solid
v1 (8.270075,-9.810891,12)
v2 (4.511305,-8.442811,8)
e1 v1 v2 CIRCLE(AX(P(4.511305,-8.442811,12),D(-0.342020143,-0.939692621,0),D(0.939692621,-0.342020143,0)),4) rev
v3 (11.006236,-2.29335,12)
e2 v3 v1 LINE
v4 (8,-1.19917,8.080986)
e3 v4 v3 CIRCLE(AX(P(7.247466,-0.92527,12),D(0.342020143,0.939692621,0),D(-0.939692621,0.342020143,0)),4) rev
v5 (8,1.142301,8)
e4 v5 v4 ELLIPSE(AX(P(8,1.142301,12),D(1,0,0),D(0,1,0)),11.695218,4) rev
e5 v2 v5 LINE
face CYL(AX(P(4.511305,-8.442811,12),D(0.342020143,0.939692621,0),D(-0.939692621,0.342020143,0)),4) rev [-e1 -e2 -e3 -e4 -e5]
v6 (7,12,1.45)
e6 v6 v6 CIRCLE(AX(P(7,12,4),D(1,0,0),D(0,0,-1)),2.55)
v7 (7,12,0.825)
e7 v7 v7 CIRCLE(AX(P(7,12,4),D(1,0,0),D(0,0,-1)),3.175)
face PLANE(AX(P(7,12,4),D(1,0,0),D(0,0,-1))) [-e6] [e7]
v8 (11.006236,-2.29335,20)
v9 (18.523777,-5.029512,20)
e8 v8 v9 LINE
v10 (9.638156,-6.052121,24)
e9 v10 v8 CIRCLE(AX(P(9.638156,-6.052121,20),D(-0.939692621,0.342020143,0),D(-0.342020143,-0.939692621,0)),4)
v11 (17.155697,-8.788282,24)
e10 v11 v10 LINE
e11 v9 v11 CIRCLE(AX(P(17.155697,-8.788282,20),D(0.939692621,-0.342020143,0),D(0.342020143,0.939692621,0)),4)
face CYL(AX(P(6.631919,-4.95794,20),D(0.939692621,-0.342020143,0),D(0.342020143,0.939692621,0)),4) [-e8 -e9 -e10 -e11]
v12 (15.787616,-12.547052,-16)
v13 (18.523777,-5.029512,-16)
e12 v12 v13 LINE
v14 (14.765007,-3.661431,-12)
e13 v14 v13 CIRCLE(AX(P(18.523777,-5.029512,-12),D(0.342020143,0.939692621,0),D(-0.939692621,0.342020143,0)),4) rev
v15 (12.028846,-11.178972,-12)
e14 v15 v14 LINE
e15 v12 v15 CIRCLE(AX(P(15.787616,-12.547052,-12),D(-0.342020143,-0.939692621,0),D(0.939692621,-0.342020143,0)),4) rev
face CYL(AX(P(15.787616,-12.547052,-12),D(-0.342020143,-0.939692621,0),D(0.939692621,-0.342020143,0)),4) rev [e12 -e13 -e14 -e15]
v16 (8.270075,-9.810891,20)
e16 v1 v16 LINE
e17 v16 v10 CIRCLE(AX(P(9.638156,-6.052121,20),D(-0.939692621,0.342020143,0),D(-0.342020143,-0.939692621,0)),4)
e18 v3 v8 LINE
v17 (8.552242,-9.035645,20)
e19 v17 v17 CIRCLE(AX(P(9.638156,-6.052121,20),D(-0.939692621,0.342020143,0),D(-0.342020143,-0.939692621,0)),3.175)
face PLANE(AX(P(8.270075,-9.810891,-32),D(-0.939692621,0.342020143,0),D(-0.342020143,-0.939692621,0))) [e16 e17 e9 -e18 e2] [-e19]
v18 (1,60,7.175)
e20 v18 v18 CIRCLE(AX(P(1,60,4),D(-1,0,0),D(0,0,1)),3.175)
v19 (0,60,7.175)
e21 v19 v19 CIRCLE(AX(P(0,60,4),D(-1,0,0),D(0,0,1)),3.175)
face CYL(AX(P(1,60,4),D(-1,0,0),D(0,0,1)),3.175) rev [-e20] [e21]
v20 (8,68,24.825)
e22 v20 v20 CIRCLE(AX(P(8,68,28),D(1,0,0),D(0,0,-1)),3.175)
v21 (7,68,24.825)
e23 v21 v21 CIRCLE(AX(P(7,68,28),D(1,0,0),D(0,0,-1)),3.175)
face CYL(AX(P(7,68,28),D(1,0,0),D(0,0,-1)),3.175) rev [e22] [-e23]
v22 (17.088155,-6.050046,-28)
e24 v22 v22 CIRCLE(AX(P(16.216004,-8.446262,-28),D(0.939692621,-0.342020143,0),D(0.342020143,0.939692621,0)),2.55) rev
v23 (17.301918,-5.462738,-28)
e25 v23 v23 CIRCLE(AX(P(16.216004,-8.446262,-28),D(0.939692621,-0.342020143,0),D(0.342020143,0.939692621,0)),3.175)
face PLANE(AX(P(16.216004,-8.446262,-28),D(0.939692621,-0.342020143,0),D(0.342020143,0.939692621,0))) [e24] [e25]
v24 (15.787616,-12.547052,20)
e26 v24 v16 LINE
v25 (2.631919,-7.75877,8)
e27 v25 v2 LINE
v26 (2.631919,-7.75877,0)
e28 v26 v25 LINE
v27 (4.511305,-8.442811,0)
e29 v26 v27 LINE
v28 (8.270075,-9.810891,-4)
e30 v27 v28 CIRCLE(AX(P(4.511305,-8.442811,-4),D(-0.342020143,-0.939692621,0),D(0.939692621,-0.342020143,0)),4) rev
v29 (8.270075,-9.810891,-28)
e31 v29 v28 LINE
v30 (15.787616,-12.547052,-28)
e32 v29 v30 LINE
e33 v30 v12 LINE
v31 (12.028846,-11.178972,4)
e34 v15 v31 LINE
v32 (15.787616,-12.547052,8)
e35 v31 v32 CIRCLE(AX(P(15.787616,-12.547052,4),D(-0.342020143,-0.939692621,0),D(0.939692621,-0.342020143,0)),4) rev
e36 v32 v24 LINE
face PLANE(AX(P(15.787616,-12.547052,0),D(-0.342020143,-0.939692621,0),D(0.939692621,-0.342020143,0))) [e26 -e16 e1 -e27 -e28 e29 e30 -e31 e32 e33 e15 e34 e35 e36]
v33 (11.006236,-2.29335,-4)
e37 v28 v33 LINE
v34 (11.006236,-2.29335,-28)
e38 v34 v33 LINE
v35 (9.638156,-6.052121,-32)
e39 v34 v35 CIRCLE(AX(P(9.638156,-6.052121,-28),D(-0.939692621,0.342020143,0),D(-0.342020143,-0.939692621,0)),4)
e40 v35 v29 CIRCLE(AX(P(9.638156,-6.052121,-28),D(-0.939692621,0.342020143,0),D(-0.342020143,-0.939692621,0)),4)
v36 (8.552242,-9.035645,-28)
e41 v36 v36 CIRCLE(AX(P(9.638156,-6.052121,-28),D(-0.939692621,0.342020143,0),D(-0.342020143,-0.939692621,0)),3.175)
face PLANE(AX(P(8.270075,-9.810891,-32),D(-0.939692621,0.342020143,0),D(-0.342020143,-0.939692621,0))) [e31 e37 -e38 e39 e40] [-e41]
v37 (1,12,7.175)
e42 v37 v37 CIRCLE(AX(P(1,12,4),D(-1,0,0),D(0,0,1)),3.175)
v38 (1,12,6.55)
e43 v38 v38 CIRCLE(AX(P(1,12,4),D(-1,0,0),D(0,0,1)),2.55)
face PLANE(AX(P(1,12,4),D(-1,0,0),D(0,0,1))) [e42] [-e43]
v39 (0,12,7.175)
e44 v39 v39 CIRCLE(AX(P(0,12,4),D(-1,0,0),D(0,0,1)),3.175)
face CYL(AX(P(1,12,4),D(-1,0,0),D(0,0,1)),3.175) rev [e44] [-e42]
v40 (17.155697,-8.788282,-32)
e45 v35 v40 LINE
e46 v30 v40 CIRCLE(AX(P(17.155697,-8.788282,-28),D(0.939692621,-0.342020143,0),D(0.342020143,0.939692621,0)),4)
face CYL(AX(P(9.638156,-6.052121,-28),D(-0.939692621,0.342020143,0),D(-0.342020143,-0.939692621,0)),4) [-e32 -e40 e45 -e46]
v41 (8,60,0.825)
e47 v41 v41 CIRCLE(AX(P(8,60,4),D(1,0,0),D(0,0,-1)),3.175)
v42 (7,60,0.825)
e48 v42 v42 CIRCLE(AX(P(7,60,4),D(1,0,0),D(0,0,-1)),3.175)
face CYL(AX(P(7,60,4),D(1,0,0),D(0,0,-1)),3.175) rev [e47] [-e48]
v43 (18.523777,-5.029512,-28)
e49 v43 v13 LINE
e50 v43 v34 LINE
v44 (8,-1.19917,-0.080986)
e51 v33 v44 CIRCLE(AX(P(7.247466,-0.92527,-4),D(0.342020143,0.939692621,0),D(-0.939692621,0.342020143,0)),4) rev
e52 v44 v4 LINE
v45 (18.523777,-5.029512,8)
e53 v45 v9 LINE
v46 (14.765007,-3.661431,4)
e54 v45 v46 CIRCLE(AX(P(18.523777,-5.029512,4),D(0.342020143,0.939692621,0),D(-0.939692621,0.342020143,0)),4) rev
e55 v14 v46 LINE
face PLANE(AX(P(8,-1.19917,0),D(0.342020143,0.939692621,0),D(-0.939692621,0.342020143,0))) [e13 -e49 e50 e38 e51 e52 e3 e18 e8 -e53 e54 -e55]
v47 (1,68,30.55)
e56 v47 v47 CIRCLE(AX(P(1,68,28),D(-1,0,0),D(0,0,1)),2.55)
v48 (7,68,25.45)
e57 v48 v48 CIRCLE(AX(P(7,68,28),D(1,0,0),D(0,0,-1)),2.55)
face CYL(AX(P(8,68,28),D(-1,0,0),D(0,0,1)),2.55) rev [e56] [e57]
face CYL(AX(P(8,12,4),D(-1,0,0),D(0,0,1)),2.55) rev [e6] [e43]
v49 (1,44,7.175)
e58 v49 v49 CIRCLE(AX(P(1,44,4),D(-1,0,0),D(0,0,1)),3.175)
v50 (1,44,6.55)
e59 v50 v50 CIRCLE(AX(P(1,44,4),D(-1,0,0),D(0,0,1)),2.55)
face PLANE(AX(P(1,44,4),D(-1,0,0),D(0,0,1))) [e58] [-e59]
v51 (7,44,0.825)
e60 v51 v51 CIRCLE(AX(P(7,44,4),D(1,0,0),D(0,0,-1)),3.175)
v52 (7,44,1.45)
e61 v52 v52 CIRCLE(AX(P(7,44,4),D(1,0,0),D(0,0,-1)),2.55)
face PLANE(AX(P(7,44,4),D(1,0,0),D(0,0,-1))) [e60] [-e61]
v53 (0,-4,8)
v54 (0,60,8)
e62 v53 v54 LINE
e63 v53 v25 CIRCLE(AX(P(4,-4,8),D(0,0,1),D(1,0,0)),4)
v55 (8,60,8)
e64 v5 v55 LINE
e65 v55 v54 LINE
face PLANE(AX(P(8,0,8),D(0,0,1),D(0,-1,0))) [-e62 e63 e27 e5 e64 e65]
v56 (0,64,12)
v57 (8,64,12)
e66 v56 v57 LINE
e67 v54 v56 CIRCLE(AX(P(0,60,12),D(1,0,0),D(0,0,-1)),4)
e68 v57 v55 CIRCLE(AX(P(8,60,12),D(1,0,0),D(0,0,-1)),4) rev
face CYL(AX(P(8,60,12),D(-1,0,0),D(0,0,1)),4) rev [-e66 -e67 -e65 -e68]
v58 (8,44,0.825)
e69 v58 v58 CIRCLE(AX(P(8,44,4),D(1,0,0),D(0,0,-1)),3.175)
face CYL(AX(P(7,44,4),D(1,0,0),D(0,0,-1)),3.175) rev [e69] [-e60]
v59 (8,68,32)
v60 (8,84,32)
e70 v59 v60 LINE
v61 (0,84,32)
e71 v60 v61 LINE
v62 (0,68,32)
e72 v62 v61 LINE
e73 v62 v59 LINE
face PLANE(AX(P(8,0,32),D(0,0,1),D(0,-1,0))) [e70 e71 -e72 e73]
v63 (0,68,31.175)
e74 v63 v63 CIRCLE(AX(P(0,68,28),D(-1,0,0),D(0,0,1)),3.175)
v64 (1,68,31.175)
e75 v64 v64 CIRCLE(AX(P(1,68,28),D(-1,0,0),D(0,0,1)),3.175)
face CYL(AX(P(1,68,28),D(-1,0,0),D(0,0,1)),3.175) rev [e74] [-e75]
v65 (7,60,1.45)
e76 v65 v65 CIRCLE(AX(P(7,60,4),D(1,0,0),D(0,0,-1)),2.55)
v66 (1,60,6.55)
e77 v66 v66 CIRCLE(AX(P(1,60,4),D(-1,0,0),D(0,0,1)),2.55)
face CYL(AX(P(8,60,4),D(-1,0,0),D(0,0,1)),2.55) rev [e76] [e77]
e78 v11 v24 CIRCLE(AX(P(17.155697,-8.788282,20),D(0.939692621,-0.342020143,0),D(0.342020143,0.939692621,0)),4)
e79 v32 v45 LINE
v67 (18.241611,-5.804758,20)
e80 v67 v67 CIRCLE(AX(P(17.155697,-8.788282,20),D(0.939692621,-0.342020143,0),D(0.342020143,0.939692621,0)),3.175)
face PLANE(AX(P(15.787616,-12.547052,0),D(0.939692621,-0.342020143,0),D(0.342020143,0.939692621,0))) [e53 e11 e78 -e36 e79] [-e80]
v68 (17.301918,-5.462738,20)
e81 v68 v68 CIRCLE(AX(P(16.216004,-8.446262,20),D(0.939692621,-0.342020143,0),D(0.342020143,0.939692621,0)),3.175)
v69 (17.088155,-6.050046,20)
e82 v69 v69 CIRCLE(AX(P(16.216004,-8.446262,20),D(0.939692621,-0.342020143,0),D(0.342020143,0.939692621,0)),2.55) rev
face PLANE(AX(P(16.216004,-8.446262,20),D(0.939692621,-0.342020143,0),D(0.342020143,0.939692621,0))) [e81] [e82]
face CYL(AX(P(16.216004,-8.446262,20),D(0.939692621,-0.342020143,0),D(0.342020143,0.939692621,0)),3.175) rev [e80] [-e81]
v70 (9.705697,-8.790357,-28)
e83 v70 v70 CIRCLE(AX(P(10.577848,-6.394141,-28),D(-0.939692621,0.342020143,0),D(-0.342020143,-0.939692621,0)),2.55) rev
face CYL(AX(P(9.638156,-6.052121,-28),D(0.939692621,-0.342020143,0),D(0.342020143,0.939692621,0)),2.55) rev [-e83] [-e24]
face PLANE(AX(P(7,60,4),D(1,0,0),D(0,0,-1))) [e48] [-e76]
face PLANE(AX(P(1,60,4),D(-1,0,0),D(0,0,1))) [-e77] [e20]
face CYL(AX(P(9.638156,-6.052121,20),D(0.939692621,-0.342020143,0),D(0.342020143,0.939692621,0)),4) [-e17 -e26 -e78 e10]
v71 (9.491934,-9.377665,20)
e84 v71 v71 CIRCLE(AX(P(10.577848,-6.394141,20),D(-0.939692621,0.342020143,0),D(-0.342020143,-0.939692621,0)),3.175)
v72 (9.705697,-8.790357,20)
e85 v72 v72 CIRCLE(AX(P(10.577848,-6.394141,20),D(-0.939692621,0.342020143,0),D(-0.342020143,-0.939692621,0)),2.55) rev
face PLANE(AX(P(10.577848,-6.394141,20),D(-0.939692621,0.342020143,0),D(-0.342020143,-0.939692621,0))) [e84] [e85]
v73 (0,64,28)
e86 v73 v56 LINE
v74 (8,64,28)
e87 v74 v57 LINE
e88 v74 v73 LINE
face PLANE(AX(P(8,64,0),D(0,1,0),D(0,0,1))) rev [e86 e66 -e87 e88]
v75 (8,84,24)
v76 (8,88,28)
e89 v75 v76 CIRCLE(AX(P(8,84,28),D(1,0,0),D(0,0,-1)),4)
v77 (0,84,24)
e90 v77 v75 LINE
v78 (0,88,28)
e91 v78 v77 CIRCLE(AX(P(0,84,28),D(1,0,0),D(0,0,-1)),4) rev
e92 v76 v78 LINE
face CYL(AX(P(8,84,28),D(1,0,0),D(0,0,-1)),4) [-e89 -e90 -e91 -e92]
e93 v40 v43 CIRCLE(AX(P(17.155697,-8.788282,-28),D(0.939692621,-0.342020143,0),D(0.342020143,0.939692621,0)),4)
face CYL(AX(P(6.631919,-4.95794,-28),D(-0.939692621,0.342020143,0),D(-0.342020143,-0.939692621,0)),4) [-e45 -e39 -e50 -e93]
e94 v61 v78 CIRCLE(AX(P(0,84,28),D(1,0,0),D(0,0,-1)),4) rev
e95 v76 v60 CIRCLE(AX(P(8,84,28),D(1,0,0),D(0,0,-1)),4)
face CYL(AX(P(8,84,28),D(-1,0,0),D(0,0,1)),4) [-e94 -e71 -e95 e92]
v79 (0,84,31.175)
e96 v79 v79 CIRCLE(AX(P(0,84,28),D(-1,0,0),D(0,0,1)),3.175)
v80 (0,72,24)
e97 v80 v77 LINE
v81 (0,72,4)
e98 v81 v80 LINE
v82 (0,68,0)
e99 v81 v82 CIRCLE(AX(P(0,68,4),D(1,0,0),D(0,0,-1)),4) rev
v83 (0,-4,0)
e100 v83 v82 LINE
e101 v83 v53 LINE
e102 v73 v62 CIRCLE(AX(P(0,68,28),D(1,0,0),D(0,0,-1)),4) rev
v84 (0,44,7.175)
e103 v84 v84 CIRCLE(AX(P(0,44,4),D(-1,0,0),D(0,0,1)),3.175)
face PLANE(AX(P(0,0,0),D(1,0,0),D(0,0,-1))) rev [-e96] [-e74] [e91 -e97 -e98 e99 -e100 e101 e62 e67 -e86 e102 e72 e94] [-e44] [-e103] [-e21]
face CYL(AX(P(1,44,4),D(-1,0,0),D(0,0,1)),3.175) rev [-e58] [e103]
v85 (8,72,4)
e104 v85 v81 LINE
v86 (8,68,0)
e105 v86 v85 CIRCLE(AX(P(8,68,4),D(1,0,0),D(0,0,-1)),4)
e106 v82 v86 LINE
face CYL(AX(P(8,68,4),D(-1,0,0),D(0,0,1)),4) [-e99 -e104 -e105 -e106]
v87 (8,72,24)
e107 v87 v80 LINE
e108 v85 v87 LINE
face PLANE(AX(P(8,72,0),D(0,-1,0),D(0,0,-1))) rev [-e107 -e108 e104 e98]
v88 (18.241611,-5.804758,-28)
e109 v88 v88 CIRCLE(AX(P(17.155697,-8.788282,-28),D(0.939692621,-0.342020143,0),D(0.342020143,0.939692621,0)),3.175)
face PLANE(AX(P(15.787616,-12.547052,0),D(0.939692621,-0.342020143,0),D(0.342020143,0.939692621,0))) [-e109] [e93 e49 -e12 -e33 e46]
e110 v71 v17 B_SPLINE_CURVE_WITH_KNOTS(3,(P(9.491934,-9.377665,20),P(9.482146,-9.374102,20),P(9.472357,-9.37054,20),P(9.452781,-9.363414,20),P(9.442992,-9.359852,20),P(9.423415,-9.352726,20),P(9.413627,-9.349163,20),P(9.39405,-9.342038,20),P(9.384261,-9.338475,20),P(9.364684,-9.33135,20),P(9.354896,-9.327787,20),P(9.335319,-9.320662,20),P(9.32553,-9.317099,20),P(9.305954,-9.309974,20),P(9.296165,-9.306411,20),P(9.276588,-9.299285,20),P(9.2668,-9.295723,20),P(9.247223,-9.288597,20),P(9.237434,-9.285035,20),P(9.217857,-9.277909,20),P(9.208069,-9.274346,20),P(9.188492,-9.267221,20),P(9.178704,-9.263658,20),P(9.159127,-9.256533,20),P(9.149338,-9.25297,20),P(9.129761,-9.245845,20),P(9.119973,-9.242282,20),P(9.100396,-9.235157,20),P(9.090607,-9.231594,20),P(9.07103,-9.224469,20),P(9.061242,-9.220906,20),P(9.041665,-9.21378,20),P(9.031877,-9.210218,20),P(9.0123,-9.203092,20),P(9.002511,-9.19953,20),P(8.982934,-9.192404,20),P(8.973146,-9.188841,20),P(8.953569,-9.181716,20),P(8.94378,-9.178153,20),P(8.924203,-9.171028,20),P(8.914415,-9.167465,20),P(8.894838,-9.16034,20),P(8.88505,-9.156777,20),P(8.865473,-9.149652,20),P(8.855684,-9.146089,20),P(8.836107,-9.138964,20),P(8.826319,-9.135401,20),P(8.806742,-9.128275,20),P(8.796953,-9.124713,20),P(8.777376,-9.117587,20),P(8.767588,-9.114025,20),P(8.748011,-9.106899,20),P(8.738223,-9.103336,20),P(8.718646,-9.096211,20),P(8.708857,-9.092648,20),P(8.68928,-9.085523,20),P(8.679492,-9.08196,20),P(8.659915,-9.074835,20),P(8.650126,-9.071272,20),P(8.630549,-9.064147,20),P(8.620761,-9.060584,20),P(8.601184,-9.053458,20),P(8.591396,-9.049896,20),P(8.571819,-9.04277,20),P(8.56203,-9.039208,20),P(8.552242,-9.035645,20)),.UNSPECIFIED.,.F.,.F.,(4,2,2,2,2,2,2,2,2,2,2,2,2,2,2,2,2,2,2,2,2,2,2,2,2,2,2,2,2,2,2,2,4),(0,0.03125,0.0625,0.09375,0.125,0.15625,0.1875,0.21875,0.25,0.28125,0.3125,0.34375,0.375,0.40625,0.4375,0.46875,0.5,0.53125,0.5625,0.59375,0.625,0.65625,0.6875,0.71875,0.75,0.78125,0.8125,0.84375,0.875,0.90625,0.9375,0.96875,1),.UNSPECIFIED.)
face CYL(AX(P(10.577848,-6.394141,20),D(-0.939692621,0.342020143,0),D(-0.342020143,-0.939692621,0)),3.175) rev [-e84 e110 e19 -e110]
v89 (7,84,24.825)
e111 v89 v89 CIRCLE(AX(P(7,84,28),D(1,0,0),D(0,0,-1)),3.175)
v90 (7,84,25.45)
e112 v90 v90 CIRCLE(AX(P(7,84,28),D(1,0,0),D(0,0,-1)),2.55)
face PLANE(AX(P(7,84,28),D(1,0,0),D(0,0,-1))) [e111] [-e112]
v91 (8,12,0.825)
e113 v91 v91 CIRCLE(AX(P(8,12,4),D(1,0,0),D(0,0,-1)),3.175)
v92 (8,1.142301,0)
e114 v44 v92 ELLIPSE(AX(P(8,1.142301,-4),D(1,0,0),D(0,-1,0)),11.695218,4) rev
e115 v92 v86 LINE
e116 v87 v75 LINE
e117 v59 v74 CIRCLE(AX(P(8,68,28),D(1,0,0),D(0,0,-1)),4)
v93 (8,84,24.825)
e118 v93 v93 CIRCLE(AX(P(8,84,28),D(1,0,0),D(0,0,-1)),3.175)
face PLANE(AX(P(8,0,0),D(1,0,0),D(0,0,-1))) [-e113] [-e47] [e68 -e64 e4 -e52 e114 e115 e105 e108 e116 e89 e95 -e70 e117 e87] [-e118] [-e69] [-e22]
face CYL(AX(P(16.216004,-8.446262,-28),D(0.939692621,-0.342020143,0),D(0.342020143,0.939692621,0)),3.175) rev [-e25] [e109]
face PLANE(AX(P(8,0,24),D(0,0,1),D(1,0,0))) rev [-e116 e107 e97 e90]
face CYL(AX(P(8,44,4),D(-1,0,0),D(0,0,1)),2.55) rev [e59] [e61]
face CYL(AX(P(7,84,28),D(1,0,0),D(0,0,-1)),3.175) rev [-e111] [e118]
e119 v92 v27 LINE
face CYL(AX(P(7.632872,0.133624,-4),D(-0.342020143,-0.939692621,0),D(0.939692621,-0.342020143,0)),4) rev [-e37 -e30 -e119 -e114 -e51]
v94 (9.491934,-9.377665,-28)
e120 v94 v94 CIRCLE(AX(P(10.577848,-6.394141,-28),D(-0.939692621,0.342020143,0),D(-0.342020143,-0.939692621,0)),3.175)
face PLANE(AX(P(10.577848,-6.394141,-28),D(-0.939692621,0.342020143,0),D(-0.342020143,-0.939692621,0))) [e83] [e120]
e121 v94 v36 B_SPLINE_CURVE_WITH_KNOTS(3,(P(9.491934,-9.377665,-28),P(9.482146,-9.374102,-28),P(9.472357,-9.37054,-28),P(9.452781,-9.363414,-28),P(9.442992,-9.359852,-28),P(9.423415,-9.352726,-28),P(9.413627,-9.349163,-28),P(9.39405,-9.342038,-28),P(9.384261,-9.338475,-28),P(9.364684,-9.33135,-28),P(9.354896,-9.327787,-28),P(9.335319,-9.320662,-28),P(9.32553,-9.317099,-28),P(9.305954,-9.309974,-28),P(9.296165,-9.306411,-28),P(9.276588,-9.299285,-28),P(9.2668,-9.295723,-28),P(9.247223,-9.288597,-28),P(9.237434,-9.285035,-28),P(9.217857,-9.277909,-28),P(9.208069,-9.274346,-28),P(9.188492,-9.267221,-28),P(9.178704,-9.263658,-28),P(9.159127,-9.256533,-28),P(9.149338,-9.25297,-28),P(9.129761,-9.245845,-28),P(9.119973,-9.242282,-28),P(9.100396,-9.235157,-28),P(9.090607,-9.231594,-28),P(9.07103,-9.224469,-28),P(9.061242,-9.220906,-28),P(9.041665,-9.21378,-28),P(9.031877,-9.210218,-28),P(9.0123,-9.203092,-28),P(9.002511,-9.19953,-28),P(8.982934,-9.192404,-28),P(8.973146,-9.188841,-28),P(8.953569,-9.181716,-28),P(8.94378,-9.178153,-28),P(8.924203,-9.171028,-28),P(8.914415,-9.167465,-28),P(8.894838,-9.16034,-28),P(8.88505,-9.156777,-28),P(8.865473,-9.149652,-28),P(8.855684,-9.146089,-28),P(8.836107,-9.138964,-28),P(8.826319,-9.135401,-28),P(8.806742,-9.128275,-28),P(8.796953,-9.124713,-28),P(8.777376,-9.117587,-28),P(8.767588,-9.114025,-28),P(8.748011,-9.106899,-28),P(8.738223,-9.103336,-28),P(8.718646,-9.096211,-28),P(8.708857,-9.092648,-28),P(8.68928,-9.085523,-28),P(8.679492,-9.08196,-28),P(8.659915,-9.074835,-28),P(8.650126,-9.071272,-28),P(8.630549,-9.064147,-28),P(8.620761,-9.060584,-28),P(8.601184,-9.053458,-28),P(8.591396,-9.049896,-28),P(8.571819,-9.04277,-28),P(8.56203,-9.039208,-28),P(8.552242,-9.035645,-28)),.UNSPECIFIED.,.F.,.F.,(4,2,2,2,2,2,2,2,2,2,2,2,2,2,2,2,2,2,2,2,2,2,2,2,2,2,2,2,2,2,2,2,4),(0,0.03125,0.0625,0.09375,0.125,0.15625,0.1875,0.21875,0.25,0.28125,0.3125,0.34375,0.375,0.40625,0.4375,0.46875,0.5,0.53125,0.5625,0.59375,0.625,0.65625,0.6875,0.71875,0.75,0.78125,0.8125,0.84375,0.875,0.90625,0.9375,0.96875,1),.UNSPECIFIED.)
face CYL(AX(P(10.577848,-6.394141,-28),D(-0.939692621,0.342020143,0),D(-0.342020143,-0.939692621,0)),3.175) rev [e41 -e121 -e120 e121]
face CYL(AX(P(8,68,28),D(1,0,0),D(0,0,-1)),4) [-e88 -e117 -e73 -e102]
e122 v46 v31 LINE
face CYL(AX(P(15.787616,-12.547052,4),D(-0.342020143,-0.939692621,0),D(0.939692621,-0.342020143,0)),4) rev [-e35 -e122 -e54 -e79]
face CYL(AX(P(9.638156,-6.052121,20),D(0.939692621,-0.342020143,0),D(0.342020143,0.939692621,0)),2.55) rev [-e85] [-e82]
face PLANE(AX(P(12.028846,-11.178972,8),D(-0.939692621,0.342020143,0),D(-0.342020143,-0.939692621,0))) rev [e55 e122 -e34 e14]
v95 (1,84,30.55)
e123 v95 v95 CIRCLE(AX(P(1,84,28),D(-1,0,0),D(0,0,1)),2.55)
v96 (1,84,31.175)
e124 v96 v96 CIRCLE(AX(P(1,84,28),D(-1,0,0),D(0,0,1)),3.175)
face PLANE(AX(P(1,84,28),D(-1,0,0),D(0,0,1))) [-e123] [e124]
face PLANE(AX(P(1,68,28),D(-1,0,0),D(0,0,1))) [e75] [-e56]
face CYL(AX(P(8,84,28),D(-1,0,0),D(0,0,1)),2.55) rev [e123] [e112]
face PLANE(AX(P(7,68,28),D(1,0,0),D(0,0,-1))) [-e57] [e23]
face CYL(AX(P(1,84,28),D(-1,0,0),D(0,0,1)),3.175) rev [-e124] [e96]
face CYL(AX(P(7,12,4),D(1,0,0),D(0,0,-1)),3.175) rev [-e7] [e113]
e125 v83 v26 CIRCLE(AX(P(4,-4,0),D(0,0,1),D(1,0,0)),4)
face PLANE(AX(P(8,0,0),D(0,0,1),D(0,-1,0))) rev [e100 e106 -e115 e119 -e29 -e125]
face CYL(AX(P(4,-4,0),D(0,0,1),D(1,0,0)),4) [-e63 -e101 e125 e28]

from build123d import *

# Parameters (mm, degrees)
SKETCH1_R           = 2.55
BOSS_EXTRUDE1_DEPTH = 8
SKETCH2_R           = 3.175
CUT_EXTRUDE1_DEPTH  = 1
CUT_EXTRUDE2_START  = -1
SKETCH3_R           = 3.175
CUT_EXTRUDE2_DEPTH  = 1
BOSS_EXTRUDE2_DEPTH = 8
SKETCH5_W           = 8
SKETCH5_H           = 56
BOSS_EXTRUDE3_DEPTH = 8
SKETCH6_W           = 4
SKETCH6_H           = 24
CUT_EXTRUDE3_DEPTH  = 8
FILLET2_R           = 4
SKETCH7_R           = 2.55
CUT_EXTRUDE4_DEPTH  = 8
SKETCH8_R           = 3.175
CUT_EXTRUDE5_DEPTH  = 1
CUT_EXTRUDE6_START  = -1
SKETCH9_R           = 3.175
CUT_EXTRUDE6_DEPTH  = 1
FILLET3_R           = 4
FILLET5_R           = 4


# Some blends are built 0.0001 mm under size
with BuildPart() as part:
    # Sketch1 → Boss-Extrude1 (new body)
    with BuildSketch(Plane.YZ):
        Polygon((0, 0), (72, 0), (72, 24), (88, 24), (88, 32), (64, 32), (64, 8), (0, 8), align=None)
        with Locations(Location((12, 4, 0), (0, 0, 270))):
            Circle(SKETCH1_R, mode=Mode.SUBTRACT)
        with Locations(Location((44, 4, 0), (0, 0, 270))):
            Circle(SKETCH1_R, mode=Mode.SUBTRACT)
        with Locations(Location((60, 4, 0), (0, 0, 270))):
            Circle(SKETCH1_R, mode=Mode.SUBTRACT)
        with Locations(Location((68, 28, 0), (0, 0, 270))):
            Circle(SKETCH1_R, mode=Mode.SUBTRACT)
        with Locations(Location((84, 28, 0), (0, 0, 270))):
            Circle(SKETCH1_R, mode=Mode.SUBTRACT)
    extrude(amount=BOSS_EXTRUDE1_DEPTH)

    # Sketch2 → Cut-Extrude1 (cut)
    with BuildSketch(Plane.YZ.offset(8)):
        with Locations(Location((68, 28, 0), (0, 0, 270))):
            Circle(SKETCH2_R)
        with Locations(Location((84, 28, 0), (0, 0, 270))):
            Circle(SKETCH2_R)
        with Locations(Location((12, 4, 0), (0, 0, 270))):
            Circle(SKETCH2_R)
        with Locations(Location((44, 4, 0), (0, 0, 270))):
            Circle(SKETCH2_R)
        with Locations(Location((60, 4, 0), (0, 0, 270))):
            Circle(SKETCH2_R)
    extrude(amount=-CUT_EXTRUDE1_DEPTH, mode=Mode.SUBTRACT)

    # Sketch3 → Cut-Extrude2 (cut)
    with BuildSketch(Plane(origin=(0, 0, 0), x_dir=(0, -1, 0), z_dir=(-1, 0, 0)).offset(CUT_EXTRUDE2_START)):
        with Locations(Location((-12, 4, 0), (0, 0, 270))):
            Circle(SKETCH3_R)
        with Locations(Location((-84, 28, 0), (0, 0, 270))):
            Circle(SKETCH3_R)
        with Locations(Location((-68, 28, 0), (0, 0, 270))):
            Circle(SKETCH3_R)
        with Locations(Location((-60, 4, 0), (0, 0, 270))):
            Circle(SKETCH3_R)
        with Locations(Location((-44, 4, 0), (0, 0, 270))):
            Circle(SKETCH3_R)
    extrude(amount=CUT_EXTRUDE2_DEPTH, mode=Mode.SUBTRACT)

    # Sketch4 → Boss-Extrude2 (add)
    with BuildSketch(Plane.XY.offset(8)):
        with BuildLine():
            Line((0, 0), (0, -4))
            ThreePointArc((0, -4), (0.723391823, -6.294305745), (2.631919427, -7.758770483))
            Line((2.631919427, -7.758770483), (15.787616118, -12.54705249))
            Line((15.787616118, -12.54705249), (18.523777264, -5.029511523))
            Line((18.523777264, -5.029511523), (8, -1.199169847))
            Line((8, -1.199169847), (8, 0))
            Line((8, 0), (0, 0))
        make_face()
    extrude(amount=-BOSS_EXTRUDE2_DEPTH)

    # Sketch5 → Boss-Extrude3 (add)
    with BuildSketch(Plane(origin=(0.550416468, 1.512256816, 0), x_dir=(-0.9396926207859096, 0.34202014332566544, 0), z_dir=(0.3420201433256654, 0.9396926207859095, 0))):
        with Locations((-15.126851056, -4)):
            Rectangle(SKETCH5_W, SKETCH5_H)
    extrude(amount=-BOSS_EXTRUDE3_DEPTH)

    # Sketch6 → Cut-Extrude3 (cut)
    with BuildSketch(Plane(origin=(0.550416468, 1.512256816, 0), x_dir=(-0.9396926207859096, 0.34202014332566544, 0), z_dir=(0.3420201433256654, 0.9396926207859095, 0))):
        with Locations((-17.126851056, -4)):
            Rectangle(SKETCH6_W, SKETCH6_H)
    extrude(amount=-CUT_EXTRUDE3_DEPTH, mode=Mode.SUBTRACT)

    # Fillet2
    # the kernel refuses this fillet: 4 mm, written as the material it adds along each edge
    with BuildSketch(Plane(origin=(8.270075151, -9.810891343, 0), x_dir=(-0.9396926207859096, 0.34202014332566544, 0), z_dir=(0.34202014332566544, 0.9396926207859096, 0))) as fillet2_piece_1_section:
        with BuildLine():
            CenterArc((FILLET2_R, -FILLET2_R), FILLET2_R, 90, 90)
            Line((0, -FILLET2_R), (0, 0))
            Line((0, 0), (FILLET2_R, 0))
        make_face()
    fillet2_piece_1 = extrude(amount=8, mode=Mode.PRIVATE)
    fillet2_piece_1 = split(fillet2_piece_1, bisect_by=Plane(origin=(8, -7.10901072, -0.334730566), z_dir=(-1, 0, 0)), keep=Keep.TOP, mode=Mode.PRIVATE)
    add(fillet2_piece_1)
    with BuildSketch(Plane(origin=(8.270075151, -9.810891343, 0), x_dir=(-0.9396926207859096, 0.34202014332566544, 0), z_dir=(0.34202014332566544, 0.9396926207859096, 0))) as fillet2_piece_2_section:
        with BuildLine():
            CenterArc((FILLET2_R, -FILLET2_R), FILLET2_R, 90, 90)
            Line((0, -FILLET2_R), (0, 0))
            Line((0, 0), (FILLET2_R, 0))
        make_face()
    fillet2_piece_2 = extrude(amount=8, mode=Mode.PRIVATE)
    fillet2_piece_2 = split(fillet2_piece_2, bisect_by=Plane(origin=(8, -5.333791146, -1.076258135), z_dir=(1, 0, 0)), keep=Keep.TOP, mode=Mode.PRIVATE)
    add(fillet2_piece_2)
    with BuildSketch(Plane(origin=(8.270075151, -9.810891343, 0), x_dir=(-0.9396926207859096, 0.34202014332566544, 0), z_dir=(0.34202014332566544, 0.9396926207859096, 0))) as fillet2_piece_3_section:
        with BuildLine():
            CenterArc((FILLET2_R, -FILLET2_R), FILLET2_R, 90, 90)
            Line((0, -FILLET2_R), (0, 0))
            Line((0, 0), (FILLET2_R, 0))
        make_face()
    fillet2_piece_3 = extrude(amount=18, mode=Mode.PRIVATE)
    fillet2_piece_3 = split(fillet2_piece_3, bisect_by=Plane(origin=(7.527179325, -1.027077195, 0.031937464), z_dir=(0.3420201433256657, 0.9396926207859095, 0)), keep=Keep.TOP, mode=Mode.PRIVATE)
    fillet2_piece_3 = split(fillet2_piece_3, bisect_by=Plane(origin=(8, -0.377545132, 0.031937464), z_dir=(-1, 0, 0)), keep=Keep.TOP, mode=Mode.PRIVATE)
    add(fillet2_piece_3)
    with BuildSketch(Plane(origin=(11.006236298, -2.293350377, 8), x_dir=(-0.9396926207859096, 0.3420201433256654, 0), z_dir=(-0.34202014332566544, -0.9396926207859096, 0))) as fillet2_piece_4_section:
        with BuildLine():
            CenterArc((FILLET2_R, -FILLET2_R), FILLET2_R, 90, 90)
            Line((0, -FILLET2_R), (0, 0))
            Line((0, 0), (FILLET2_R, 0))
        make_face()
    fillet2_piece_4 = extrude(amount=8, mode=Mode.PRIVATE)
    fillet2_piece_4 = split(fillet2_piece_4, bisect_by=Plane(origin=(8, -5.333791146, 9.076258135), z_dir=(1, 0, 0)), keep=Keep.TOP, mode=Mode.PRIVATE)
    add(fillet2_piece_4)
    with BuildSketch(Plane(origin=(14.426437731, 7.103575831, 8), x_dir=(-0.9396926207859096, 0.34202014332566544, 0), z_dir=(-0.34202014332566544, -0.9396926207859096, 0))) as fillet2_piece_5_section:
        with BuildLine():
            CenterArc((FILLET2_R, -FILLET2_R), FILLET2_R, 90, 90)
            Line((0, -FILLET2_R), (0, 0))
            Line((0, 0), (FILLET2_R, 0))
        make_face()
    fillet2_piece_5 = extrude(amount=18, mode=Mode.PRIVATE)
    fillet2_piece_5 = split(fillet2_piece_5, bisect_by=Plane(origin=(7.527179325, -1.027077195, 7.968062536), z_dir=(0.3420201433256657, 0.9396926207859095, 0)), keep=Keep.TOP, mode=Mode.PRIVATE)
    fillet2_piece_5 = split(fillet2_piece_5, bisect_by=Plane(origin=(8, -0.377545132, 7.968062536), z_dir=(-1, 0, 0)), keep=Keep.TOP, mode=Mode.PRIVATE)
    add(fillet2_piece_5)
    with BuildSketch(Plane(origin=(11.006236298, -2.293350377, 8), x_dir=(-0.9396926207859096, 0.3420201433256654, 0), z_dir=(-0.34202014332566544, -0.9396926207859096, 0))) as fillet2_piece_6_section:
        with BuildLine():
            CenterArc((FILLET2_R, -FILLET2_R), FILLET2_R, 90, 90)
            Line((0, -FILLET2_R), (0, 0))
            Line((0, 0), (FILLET2_R, 0))
        make_face()
    fillet2_piece_6 = extrude(amount=8, mode=Mode.PRIVATE)
    fillet2_piece_6 = split(fillet2_piece_6, bisect_by=Plane(origin=(8, -7.10901072, 8.334730566), z_dir=(-1, 0, 0)), keep=Keep.TOP, mode=Mode.PRIVATE)
    add(fillet2_piece_6)
    with BuildSketch(Plane(origin=(14.765006781, -3.66143095, -16), x_dir=(0, 0, 1), z_dir=(-0.34202014332566544, -0.9396926207859096, 0)), Plane(origin=(14.765006781, -3.66143095, 8), x_dir=(0.9396926207859096, -0.34202014332566544, 0), z_dir=(-0.34202014332566544, -0.9396926207859096, 0))) as fillet2_piece_7:
        with BuildLine():
            CenterArc((FILLET2_R, -FILLET2_R), FILLET2_R, 90, 90)
            Line((0, -FILLET2_R), (0, 0))
            Line((0, 0), (FILLET2_R, 0))
        make_face()
    extrude(amount=8)
    # the kernel refuses this fillet: 4 mm, written as the material it takes off along each edge
    with BuildSketch(Plane(origin=(1.60931009, 1.126851056, -32), x_dir=(-0.3420201433256655, -0.9396926207859096, 0), z_dir=(0.9396926207859096, -0.34202014332566544, 0)), Plane(origin=(27.920703472, -8.449712957, 24), x_dir=(-0.34202014332566544, -0.9396926207859096, 0), z_dir=(-0.9396926207859096, 0.34202014332566544, 0))) as fillet2_2_piece_1:
        with BuildLine():
            CenterArc((FILLET2_R, -FILLET2_R), FILLET2_R, 90, 90)
            Line((0, -FILLET2_R), (0, 0))
            Line((0, 0), (FILLET2_R, 0))
        make_face()
    extrude(amount=28, mode=Mode.SUBTRACT)
    with BuildSketch(Plane(origin=(-1.126851056, -6.39068991, -32), x_dir=(0.34202014332566544, 0.9396926207859096, 0), z_dir=(0.9396926207859096, -0.34202014332566544, 0)), Plane(origin=(25.184542326, -15.967253923, 24), x_dir=(0.34202014332566544, 0.9396926207859096, 0), z_dir=(-0.9396926207859096, 0.34202014332566544, 0))) as fillet2_2_piece_2:
        with BuildLine():
            CenterArc((FILLET2_R, FILLET2_R), FILLET2_R, 180, 90)
            Line((0, FILLET2_R), (0, 0))
            Line((0, 0), (FILLET2_R, 0))
        make_face()
    extrude(amount=28, mode=Mode.SUBTRACT)

    # Sketch7 → Cut-Extrude4 (cut)
    with BuildSketch(Plane(origin=(17.973360797, -6.54176834, 0), x_dir=(0.3420201433256649, 0.9396926207859099, 0), z_dir=(0.9396926207859099, -0.3420201433256649, 0))):
        with Locations((-2.39068991, 20)):
            Circle(SKETCH7_R)
        with Locations((-2.39068991, -28)):
            Circle(SKETCH7_R)
    extrude(amount=-CUT_EXTRUDE4_DEPTH, mode=Mode.SUBTRACT)

    # Sketch8 → Cut-Extrude5 (cut)
    with BuildSketch(Plane(origin=(17.973360797, -6.54176834, 0), x_dir=(0.3420201433256649, 0.9396926207859099, 0), z_dir=(0.9396926207859099, -0.3420201433256649, 0))):
        with Locations((-2.39068991, 20)):
            Circle(SKETCH8_R)
        with Locations((-2.39068991, -28)):
            Circle(SKETCH8_R)
    extrude(amount=-CUT_EXTRUDE5_DEPTH, mode=Mode.SUBTRACT)

    # Sketch9 → Cut-Extrude6 (cut)
    with BuildSketch(Plane(origin=(10.45581983, -3.805607193, 0), x_dir=(-0.3420201433256654, -0.9396926207859095, 0), z_dir=(-0.9396926207859095, 0.3420201433256654, 0)).offset(CUT_EXTRUDE6_START)):
        with Locations(Location((2.39068991, -28, 0), (0, 0, 180))):
            Circle(SKETCH9_R)
        with Locations(Location((2.39068991, 20, 0), (0, 0, 180))):
            Circle(SKETCH9_R)
    extrude(amount=CUT_EXTRUDE6_DEPTH, mode=Mode.SUBTRACT)

    # Fillet3
    fillet3_edges = [part.edges().sort_by_distance(p)[0] for p in [
        (4, 72, 0),
        (4, 64, 8),
    ]]
    fillet(fillet3_edges, radius=FILLET3_R)

    # Fillet5
    fillet5_edges = [part.edges().sort_by_distance(p)[0] for p in [
        (4, 88, 24),
        (4, 64, 32),
        (4, 88, 32),
    ]]
    fillet(fillet5_edges, radius=FILLET5_R - 0.0001)  # a hair under: the kernel refuses the full size


solid = part.part
